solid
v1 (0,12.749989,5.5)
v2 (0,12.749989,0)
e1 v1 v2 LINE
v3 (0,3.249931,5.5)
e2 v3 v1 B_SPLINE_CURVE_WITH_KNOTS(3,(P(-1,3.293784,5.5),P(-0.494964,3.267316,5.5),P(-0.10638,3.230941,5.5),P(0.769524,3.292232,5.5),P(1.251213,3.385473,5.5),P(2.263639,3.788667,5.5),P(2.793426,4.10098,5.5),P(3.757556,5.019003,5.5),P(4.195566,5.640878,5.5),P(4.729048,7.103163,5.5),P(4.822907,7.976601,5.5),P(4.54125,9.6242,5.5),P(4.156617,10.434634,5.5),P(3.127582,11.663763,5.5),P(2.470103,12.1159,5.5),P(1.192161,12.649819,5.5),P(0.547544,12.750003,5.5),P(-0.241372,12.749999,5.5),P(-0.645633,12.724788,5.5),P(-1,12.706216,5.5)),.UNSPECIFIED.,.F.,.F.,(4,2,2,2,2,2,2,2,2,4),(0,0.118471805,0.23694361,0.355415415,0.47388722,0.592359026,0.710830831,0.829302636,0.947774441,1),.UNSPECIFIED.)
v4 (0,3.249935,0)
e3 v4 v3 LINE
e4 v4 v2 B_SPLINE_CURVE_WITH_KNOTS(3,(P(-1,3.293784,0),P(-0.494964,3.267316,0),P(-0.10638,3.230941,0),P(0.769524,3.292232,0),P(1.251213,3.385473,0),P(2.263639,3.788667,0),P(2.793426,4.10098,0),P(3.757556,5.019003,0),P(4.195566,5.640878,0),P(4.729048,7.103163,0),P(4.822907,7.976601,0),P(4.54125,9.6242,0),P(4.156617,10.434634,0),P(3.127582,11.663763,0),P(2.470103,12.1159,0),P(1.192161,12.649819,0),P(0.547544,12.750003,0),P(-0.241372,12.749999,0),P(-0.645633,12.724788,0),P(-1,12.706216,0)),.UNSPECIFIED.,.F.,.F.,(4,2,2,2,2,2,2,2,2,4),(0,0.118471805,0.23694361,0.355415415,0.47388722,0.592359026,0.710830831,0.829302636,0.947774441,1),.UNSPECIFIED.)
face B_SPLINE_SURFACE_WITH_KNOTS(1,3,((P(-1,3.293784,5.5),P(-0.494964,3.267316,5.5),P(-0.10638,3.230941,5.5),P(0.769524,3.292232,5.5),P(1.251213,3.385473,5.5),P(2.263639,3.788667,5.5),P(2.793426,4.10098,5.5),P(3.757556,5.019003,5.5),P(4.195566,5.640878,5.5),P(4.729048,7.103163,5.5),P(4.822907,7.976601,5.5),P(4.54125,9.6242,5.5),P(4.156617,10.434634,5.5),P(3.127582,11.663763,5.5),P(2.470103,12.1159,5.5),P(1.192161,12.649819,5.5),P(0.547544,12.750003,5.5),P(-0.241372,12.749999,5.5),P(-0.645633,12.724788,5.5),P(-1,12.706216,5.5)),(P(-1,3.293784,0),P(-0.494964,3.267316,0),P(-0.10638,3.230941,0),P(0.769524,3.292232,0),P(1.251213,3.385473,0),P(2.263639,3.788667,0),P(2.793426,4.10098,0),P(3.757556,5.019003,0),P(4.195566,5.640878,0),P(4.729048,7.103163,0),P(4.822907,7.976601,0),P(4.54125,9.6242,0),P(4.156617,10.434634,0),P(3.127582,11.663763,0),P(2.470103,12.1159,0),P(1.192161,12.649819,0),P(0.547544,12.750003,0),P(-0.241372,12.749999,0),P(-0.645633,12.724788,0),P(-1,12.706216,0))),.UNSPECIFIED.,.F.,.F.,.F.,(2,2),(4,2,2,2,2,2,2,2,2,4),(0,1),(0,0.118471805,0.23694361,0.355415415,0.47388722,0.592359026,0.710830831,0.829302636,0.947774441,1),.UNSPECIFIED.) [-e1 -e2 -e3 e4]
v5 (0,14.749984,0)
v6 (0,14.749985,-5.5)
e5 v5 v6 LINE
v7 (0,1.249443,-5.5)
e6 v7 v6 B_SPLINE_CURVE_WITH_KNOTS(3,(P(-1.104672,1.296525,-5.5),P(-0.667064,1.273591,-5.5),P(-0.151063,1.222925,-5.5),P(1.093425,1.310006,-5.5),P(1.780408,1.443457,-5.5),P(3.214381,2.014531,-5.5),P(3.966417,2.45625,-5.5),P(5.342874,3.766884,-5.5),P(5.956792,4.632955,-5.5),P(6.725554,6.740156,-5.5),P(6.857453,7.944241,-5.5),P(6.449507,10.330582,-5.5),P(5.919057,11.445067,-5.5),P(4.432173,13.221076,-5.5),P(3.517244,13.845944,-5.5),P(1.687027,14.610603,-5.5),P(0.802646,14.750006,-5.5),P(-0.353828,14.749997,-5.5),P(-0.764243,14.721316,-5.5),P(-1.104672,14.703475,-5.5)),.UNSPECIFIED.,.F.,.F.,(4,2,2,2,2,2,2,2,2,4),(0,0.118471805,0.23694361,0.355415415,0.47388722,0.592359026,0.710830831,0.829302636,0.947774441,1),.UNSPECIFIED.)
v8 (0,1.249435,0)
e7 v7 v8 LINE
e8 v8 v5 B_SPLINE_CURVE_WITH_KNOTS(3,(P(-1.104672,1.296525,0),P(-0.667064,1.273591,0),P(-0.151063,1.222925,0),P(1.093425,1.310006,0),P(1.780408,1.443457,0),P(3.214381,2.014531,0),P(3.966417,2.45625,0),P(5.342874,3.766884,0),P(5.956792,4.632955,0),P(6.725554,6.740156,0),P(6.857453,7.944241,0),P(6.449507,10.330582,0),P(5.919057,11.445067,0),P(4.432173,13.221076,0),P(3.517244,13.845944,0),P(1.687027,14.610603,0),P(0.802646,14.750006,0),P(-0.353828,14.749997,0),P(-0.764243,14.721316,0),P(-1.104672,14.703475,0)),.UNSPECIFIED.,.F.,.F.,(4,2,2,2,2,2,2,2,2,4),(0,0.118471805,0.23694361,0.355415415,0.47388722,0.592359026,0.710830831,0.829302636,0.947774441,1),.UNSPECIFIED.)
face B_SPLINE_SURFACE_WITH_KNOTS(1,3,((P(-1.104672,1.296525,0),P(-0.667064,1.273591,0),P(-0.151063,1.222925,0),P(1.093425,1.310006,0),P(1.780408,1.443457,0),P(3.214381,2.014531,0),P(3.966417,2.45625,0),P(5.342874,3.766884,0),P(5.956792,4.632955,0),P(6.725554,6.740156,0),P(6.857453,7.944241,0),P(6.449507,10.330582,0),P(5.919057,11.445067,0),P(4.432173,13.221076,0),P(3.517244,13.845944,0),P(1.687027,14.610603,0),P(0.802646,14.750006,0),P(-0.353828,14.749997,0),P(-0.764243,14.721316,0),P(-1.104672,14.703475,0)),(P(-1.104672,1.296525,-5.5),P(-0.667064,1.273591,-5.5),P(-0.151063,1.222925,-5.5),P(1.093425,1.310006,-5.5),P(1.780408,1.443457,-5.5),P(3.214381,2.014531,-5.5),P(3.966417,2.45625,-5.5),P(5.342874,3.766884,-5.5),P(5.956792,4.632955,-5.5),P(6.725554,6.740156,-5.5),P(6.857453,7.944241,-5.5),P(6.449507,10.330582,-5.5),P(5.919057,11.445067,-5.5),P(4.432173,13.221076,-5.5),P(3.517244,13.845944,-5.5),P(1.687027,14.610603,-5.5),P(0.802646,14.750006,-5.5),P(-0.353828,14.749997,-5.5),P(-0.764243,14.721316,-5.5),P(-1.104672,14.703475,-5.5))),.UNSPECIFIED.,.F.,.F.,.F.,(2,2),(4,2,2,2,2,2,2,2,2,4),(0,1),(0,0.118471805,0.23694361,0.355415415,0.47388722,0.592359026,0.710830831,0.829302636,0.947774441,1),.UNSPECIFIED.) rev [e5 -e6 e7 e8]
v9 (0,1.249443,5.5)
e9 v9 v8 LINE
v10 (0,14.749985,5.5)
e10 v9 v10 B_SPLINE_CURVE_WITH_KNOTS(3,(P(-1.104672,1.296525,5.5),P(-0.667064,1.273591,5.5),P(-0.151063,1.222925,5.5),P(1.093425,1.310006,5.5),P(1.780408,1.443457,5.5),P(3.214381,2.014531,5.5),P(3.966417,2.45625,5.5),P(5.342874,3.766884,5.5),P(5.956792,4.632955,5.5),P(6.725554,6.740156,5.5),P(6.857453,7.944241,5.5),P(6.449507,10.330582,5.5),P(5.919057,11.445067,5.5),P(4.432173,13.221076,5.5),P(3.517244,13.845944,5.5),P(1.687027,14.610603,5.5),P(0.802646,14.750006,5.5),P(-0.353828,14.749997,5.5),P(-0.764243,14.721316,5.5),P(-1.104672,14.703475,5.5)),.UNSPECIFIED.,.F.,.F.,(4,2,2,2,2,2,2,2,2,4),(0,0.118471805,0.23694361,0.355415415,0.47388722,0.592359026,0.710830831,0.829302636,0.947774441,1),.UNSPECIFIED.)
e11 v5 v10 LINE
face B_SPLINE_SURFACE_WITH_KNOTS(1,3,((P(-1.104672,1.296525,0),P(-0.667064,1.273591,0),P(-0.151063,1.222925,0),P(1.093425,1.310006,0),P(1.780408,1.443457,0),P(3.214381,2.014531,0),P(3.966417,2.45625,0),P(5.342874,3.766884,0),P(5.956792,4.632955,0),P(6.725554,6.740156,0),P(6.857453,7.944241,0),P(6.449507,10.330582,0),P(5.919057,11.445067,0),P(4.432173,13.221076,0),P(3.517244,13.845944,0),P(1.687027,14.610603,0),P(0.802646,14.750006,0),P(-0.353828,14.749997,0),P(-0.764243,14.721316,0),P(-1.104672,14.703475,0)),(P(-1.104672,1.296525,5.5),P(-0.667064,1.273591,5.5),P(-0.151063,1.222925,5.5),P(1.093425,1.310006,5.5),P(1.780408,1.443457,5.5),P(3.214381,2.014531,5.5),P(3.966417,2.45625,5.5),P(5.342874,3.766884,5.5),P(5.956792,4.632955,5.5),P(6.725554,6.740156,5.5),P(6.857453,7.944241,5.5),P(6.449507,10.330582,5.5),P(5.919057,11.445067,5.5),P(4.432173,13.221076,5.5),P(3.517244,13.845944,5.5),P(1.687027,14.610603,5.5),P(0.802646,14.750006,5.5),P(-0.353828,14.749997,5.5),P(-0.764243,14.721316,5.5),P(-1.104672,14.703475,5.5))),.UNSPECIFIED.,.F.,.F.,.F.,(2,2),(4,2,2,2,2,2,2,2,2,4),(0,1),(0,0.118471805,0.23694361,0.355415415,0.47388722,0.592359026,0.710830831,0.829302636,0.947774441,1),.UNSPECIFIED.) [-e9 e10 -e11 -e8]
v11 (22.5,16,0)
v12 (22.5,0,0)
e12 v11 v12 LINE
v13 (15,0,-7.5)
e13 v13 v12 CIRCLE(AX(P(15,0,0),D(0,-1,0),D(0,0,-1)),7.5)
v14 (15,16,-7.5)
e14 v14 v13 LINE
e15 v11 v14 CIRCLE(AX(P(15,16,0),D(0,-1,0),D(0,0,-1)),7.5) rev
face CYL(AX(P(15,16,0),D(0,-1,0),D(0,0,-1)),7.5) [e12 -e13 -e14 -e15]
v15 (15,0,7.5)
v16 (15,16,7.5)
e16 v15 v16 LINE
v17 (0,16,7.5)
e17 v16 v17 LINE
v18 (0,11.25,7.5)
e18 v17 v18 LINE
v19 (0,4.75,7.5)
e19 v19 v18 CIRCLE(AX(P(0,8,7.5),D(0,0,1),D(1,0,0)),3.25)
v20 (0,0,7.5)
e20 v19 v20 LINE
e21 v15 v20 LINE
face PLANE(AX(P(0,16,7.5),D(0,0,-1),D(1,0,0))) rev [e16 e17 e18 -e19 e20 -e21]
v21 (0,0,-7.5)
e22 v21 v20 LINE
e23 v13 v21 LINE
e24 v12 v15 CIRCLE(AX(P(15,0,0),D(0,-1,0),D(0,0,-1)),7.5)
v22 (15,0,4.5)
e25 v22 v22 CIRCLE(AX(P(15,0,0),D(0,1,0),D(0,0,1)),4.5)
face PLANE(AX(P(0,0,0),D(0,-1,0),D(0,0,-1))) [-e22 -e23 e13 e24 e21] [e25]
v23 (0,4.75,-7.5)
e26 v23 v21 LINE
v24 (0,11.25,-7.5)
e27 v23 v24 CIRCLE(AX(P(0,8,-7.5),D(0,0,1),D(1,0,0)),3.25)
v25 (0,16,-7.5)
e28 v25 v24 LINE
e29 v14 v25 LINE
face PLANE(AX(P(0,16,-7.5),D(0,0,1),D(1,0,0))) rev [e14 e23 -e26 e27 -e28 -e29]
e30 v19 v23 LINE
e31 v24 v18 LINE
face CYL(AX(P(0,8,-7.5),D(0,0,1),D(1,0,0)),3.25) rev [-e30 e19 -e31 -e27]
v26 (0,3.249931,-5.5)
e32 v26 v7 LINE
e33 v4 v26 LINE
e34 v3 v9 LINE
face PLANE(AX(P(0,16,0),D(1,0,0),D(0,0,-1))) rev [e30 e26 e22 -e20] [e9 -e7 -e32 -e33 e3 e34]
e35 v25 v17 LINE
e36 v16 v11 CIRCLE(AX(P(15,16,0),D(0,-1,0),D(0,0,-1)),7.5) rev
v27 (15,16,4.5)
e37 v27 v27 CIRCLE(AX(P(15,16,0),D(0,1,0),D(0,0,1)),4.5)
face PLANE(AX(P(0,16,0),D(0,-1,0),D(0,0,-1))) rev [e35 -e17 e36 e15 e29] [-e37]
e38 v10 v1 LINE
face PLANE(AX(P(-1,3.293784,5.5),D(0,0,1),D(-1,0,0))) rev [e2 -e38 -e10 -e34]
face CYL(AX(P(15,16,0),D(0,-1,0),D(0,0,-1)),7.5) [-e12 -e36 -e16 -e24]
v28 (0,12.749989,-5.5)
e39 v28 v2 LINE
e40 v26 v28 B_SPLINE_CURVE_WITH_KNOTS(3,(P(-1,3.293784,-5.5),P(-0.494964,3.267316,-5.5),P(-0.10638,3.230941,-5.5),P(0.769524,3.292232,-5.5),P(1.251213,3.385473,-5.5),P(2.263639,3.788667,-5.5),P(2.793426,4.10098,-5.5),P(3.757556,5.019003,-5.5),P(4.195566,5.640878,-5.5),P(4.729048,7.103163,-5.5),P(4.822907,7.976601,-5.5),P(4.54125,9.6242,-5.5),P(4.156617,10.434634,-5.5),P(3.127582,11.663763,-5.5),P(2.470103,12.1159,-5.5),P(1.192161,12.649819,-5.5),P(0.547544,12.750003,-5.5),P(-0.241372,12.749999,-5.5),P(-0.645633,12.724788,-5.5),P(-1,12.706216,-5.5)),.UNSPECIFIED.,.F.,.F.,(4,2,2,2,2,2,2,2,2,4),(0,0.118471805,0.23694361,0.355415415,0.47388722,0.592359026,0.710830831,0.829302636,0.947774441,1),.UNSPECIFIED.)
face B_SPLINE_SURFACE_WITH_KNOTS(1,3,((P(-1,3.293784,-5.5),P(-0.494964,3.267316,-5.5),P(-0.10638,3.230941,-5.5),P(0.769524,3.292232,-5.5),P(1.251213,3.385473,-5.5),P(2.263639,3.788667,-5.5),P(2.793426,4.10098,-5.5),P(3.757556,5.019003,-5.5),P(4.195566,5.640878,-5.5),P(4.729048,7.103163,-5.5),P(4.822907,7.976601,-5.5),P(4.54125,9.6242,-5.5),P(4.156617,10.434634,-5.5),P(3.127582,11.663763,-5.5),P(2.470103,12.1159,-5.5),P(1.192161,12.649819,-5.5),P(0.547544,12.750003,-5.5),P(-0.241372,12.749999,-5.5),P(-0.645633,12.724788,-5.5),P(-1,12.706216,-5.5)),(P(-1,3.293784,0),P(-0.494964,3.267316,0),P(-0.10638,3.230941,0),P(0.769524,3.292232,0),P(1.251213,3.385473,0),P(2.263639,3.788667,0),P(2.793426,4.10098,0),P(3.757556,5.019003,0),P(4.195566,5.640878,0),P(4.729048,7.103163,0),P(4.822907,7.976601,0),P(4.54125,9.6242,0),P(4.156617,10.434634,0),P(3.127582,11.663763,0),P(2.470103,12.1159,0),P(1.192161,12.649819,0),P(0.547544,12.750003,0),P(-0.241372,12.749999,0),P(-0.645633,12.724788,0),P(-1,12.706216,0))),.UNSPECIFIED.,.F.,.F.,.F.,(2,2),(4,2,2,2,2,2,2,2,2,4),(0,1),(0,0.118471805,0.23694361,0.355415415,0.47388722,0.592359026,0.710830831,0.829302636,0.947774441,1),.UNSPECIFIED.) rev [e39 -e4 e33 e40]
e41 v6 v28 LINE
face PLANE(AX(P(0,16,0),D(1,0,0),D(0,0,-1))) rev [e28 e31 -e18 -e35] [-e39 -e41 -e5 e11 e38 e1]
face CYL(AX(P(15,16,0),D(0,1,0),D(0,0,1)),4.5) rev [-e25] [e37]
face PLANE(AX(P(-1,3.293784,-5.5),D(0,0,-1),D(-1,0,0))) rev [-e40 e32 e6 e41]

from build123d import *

# Parameters (mm, degrees)
SKETCH1_W            = 22.5
SKETCH1_H            = 7.5
BOSS_EXTRUDE1_DEPTH  = 16
SKETCH2_R            = 3.25
CUT_EXTRUDE1_DEPTH   = 29.609439002
CUT_SWEEP1_START     = -5.5
CUT_SWEEP1_DEPTH     = 5.5
M8_CLEARANCE_HOLE1_D = 9
FILLET1_R            = 7.5


# Read off the part's stored shape, not the designer's step: Cut-Sweep1
with BuildPart() as part:
    # Sketch1 → Boss-Extrude1 (new body)
    with BuildSketch(Plane(origin=(0, 0, 0), x_dir=(1, 0, 0), z_dir=(0, 1, 0))):
        with Locations((11.25, 3.75)):
            Rectangle(SKETCH1_W, SKETCH1_H)
    extrude(amount=BOSS_EXTRUDE1_DEPTH)

    # Sketch2 → Cut-Extrude1 (cut, through all)
    with BuildSketch(Plane.XY):
        with Locations((0, 8)):
            Circle(SKETCH2_R)
    extrude(amount=-CUT_EXTRUDE1_DEPTH, mode=Mode.SUBTRACT)

    # Cut-Sweep1 outline → Cut-Sweep1 (cut)
    with BuildSketch(Plane.XY.offset(CUT_SWEEP1_START)):
        with BuildLine():
            Line((0, 3.249930627), (0, 1.249434771))
            add(Edge.make_bspline(
                [(0, 1.249434771), (0.149995203, 1.25004033), (0.30688463, 1.254968997), (1.093425095, 1.310005949), (1.780407601, 1.443456641), (3.214381438, 2.014530663), (3.966417034, 2.456250234), (5.342873723, 3.766883929), (5.956791785, 4.632955322), (6.725554437, 6.74015649), (6.857452883, 7.944240799), (6.449506923, 10.330582428), (5.919057461, 11.44506695), (4.432172795, 13.221075917), (3.517243631, 13.845944042), (1.687026948, 14.610603142), (0.802645598, 14.750006388), (0, 14.75)],
                knots=[0.087190704, 0.087190704, 0.087190704, 0.087190704, 0.118471805, 0.118471805, 0.23694361, 0.23694361, 0.355415415, 0.355415415, 0.47388722, 0.47388722, 0.592359026, 0.592359026, 0.710830831, 0.710830831, 0.829302636, 0.829302636, 0.947774441, 0.947774441, 0.947774441, 0.947774441], degree=3))
            Line((0, 14.75), (0, 12.75))
            add(Edge.make_bspline(
                [(0, 3.249930627), (0.109137324, 3.250243145), (0.218715414, 3.253689733), (0.769523599, 3.292231999), (1.251212609, 3.385472533), (2.263638937, 3.788666681), (2.793426306, 4.100980011), (3.757556078, 5.019003289), (4.195566344, 5.640878482), (4.729047664, 7.103163163), (4.82290714, 7.976601279), (4.54124976, 9.62420025), (4.15661699, 10.434633992), (3.127582079, 11.66376284), (2.470103133, 12.115899669), (1.192161348, 12.64981872), (0.547543704, 12.750002903), (0, 12.75)],
                knots=[0.087942654, 0.087942654, 0.087942654, 0.087942654, 0.118471805, 0.118471805, 0.23694361, 0.23694361, 0.355415415, 0.355415415, 0.47388722, 0.47388722, 0.592359026, 0.592359026, 0.710830831, 0.710830831, 0.829302636, 0.829302636, 0.947774441, 0.947774441, 0.947774441, 0.947774441], degree=3))
        make_face()
    extrude(amount=CUT_SWEEP1_DEPTH, mode=Mode.SUBTRACT)

    # Mirror1: part across plane


with BuildPart() as part_1:
    add(part.part)
    add(part.part.mirror(Plane(origin=(0, 16, 0), x_dir=(1, 0, 0), z_dir=(0, 0, -1))))

    # M8 Clearance Hole1 (through all)
    with Locations(Plane(origin=(0, 16, 0), x_dir=(1, 0, 0), z_dir=(0, 1, 0))):
        with Locations((15, 0)):
            Hole(M8_CLEARANCE_HOLE1_D / 2)

    # Fillet1
    fillet1_edges = [part_1.edges().sort_by_distance(p)[0] for p in [
        (22.5, 8, -7.5),
        (22.5, 8, 7.5),
    ]]
    fillet(fillet1_edges, radius=FILLET1_R - 0.0001)  # a hair under: the kernel refuses the full size


solid = part_1.part
